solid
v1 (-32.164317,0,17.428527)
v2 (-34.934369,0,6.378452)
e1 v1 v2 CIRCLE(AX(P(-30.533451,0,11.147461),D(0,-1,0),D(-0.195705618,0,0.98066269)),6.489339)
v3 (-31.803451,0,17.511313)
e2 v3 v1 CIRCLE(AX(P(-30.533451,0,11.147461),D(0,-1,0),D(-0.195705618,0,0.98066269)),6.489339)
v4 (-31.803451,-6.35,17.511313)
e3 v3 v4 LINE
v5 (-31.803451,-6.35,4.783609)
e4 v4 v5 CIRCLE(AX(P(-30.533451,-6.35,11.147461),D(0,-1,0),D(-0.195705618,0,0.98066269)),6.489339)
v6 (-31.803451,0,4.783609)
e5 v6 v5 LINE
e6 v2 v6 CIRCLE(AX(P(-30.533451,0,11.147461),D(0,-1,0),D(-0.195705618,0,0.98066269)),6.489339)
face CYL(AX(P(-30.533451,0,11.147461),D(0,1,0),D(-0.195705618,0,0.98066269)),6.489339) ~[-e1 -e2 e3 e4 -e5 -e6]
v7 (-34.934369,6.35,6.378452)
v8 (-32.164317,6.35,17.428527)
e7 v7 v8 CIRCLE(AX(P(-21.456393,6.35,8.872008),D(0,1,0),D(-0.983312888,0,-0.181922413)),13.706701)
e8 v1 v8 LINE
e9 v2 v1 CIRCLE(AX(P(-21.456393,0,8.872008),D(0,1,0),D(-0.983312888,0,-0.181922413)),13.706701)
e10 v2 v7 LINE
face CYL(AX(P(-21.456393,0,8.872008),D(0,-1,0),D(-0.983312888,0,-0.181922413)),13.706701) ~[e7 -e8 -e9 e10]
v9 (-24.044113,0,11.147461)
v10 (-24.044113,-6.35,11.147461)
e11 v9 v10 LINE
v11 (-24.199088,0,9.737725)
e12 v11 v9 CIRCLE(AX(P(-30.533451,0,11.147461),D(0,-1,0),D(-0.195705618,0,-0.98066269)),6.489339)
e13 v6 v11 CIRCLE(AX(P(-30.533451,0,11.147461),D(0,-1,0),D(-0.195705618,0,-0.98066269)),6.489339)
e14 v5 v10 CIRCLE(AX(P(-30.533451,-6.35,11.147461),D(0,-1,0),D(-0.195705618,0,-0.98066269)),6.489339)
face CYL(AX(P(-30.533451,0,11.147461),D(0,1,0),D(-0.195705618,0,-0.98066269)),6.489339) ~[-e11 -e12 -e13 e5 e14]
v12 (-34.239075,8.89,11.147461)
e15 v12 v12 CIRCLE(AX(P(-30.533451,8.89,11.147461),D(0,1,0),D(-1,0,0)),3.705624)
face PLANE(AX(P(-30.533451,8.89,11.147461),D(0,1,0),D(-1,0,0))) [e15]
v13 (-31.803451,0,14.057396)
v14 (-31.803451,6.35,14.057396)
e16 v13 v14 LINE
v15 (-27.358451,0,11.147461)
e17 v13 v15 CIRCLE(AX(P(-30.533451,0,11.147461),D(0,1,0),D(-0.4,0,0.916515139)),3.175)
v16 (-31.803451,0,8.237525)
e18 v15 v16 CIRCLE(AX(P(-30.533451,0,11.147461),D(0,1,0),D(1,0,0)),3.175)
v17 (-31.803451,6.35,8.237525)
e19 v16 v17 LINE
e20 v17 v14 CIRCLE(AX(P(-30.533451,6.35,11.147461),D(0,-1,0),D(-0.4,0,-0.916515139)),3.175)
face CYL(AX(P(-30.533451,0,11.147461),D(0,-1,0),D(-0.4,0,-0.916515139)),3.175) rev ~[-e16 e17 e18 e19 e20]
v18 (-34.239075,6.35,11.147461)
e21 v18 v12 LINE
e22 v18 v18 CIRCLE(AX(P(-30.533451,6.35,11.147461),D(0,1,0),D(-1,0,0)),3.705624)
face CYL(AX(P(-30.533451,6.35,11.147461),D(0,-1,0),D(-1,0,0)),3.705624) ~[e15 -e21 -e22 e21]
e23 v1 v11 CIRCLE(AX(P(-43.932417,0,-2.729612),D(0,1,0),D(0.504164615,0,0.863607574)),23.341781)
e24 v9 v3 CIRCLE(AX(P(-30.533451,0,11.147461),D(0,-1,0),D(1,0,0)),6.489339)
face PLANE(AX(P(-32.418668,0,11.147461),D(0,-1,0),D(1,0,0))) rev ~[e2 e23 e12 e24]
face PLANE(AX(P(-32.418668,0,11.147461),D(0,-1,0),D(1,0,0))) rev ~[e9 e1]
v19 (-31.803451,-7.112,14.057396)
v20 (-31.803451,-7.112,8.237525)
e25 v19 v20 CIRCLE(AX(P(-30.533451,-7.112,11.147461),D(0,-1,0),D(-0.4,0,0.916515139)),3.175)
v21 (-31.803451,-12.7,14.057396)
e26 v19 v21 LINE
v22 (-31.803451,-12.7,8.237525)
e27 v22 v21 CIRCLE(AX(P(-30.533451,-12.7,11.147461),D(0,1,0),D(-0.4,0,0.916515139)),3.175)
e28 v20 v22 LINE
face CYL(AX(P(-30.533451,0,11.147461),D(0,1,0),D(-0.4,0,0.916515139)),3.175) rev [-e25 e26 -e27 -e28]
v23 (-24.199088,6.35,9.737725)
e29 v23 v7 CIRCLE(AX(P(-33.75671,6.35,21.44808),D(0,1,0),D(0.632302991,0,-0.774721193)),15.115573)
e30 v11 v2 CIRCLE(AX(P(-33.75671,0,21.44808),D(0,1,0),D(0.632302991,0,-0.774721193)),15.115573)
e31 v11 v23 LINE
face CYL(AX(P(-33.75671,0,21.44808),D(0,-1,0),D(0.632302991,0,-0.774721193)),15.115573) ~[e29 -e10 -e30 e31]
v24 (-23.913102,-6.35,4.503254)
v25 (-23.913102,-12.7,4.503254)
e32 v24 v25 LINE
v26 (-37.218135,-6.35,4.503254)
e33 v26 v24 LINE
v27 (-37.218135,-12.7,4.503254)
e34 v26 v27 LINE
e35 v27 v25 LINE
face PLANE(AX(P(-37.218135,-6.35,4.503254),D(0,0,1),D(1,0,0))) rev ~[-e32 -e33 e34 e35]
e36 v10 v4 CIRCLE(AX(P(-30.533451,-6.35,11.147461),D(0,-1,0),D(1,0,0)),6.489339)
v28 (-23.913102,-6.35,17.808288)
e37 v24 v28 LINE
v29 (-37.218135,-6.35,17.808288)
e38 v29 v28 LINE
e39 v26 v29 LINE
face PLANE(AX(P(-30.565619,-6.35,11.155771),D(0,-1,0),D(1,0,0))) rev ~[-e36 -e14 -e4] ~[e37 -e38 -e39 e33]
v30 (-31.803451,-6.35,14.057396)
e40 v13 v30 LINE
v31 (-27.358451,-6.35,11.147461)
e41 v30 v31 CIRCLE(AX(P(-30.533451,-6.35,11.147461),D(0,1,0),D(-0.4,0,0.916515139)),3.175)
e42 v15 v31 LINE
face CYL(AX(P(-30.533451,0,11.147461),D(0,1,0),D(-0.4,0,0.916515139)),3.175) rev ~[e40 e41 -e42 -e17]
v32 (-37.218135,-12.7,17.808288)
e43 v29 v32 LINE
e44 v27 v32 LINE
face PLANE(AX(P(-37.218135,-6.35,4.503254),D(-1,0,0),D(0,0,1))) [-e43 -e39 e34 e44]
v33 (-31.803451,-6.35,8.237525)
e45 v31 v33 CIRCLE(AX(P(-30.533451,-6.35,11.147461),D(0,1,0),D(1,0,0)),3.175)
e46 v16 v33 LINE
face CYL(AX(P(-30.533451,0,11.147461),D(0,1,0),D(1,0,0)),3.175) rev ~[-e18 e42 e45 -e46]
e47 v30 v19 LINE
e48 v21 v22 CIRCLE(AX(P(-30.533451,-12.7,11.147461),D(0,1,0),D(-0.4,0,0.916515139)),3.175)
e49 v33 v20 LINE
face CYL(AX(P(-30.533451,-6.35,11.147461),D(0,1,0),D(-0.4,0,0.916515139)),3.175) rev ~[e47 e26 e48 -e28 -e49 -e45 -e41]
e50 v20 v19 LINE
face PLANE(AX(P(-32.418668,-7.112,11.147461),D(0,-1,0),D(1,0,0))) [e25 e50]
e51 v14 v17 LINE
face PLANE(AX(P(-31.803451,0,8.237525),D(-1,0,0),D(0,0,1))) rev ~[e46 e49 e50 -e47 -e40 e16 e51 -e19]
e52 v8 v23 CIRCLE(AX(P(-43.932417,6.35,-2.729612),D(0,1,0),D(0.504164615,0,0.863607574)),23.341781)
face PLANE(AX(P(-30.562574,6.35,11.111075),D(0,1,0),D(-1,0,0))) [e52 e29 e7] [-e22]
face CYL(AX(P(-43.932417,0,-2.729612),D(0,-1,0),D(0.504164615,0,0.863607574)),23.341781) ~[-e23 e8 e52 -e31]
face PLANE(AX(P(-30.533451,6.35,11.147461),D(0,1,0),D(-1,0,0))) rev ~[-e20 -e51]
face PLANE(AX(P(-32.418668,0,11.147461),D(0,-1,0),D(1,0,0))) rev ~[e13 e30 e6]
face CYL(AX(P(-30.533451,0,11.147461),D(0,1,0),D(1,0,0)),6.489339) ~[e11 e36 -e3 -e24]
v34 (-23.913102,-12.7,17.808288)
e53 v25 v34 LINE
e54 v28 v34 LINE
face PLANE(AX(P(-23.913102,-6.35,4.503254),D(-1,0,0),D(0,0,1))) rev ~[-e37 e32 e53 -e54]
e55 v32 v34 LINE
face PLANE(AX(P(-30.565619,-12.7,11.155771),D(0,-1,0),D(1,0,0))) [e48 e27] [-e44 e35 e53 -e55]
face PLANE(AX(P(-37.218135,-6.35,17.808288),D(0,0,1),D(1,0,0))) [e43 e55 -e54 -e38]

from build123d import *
from build123d import SkipClean  # not in build123d's __all__

# Parameters (mm, degrees)
F1_DEPTH = 6.35
F2_W     = 13.3050326258
F2_H     = 13.3050344884
F2_R     = 6.4893385046
F3_DEPTH = 6.35
F4_DEPTH = 25.4
F5_DEPTH = 7.112
F7_DEPTH = 6.35
F8_R     = 3.7056239581
F9_DEPTH = 2.54


# Not quite as in the source:
# - after a boolean that leaves OpenCascade's solid faulty, fix() repairs it


with BuildPart() as f1:
    # F0 (on Front) → F1 (new body)
    with BuildSketch(Plane.XZ):
        with BuildLine():
            ThreePointArc((-31.8034514785, 8.237525334), (-33.7084514785, 11.1474609002), (-31.8034514785, 14.0573964665))
            Line((-31.8034514785, 14.0573964665), (-31.8034514785, 17.5113130534))
            ThreePointArc((-31.8034514785, 17.5113130534), (-37.0227899831, 11.1474609002), (-31.8034514785, 4.7836087471))
            Line((-31.8034514785, 4.7836087471), (-31.8034514785, 8.237525334))
        make_face()
        with BuildLine():
            Line((-31.8034514785, 8.237525334), (-31.8034514785, 14.0573964665))
            ThreePointArc((-31.8034514785, 14.0573964665), (-33.7084514785, 11.1474609002), (-31.8034514785, 8.237525334))
        make_face()
        with BuildLine():
            ThreePointArc((-31.8034514785, 14.0573964665), (-28.7944323584, 13.8038564845), (-27.3584514785, 11.1474609002))
            ThreePointArc((-27.3584514785, 11.1474609002), (-28.7944323584, 8.491065316), (-31.8034514785, 8.237525334))
            Line((-31.8034514785, 8.237525334), (-31.8034514785, 4.7836087471))
            ThreePointArc((-31.8034514785, 4.7836087471), (-26.4182325094, 6.129843232), (-24.0441129739, 11.1474609002))
            ThreePointArc((-24.0441129739, 11.1474609002), (-26.4182325094, 16.1650785684), (-31.8034514785, 17.5113130534))
            Line((-31.8034514785, 17.5113130534), (-31.8034514785, 14.0573964665))
        make_face()
    extrude(amount=F1_DEPTH)

    # F2 (on face) → F3 (join)
    with BuildSketch(Plane.XZ.offset(6.35)):
        with Locations((-30.5656185374, 11.1557710916)):
            Rectangle(F2_W, F2_H)
        with Locations((-30.5334514785, 11.1474609002)):
            Circle(F2_R, mode=Mode.SUBTRACT)
        with Locations((-30.5334514785, 11.1474609002)):
            Circle(F2_R)
        with BuildLine():
            ThreePointArc((-31.8034514785, 14.0573964665), (-27.3584514785, 11.1474609002), (-31.8034514785, 8.237525334))
            Line((-31.8034514785, 8.237525334), (-31.8034514785, 14.0573964665))
        make_face(mode=Mode.SUBTRACT)
    extrude(amount=F3_DEPTH)

    # F0 (on Front) → F4 (cut)
    with BuildSketch(Plane.XZ):
        with BuildLine():
            Line((-31.8034514785, 8.237525334), (-31.8034514785, 14.0573964665))
            ThreePointArc((-31.8034514785, 14.0573964665), (-33.7084514785, 11.1474609002), (-31.8034514785, 8.237525334))
        make_face()
    extrude(amount=F4_DEPTH, mode=Mode.SUBTRACT)

    # F0 (on Front) → F5 (join)
    with BuildSketch(Plane.XZ):
        with BuildLine():
            Line((-31.8034514785, 8.237525334), (-31.8034514785, 14.0573964665))
            ThreePointArc((-31.8034514785, 14.0573964665), (-33.7084514785, 11.1474609002), (-31.8034514785, 8.237525334))
        make_face()
    extrude(amount=F5_DEPTH)

    # F6 (on face) → F7 (join)
    with BuildSketch(Plane(origin=(0, 0, 0), x_dir=(-1, 0, 0), z_dir=(0, 1, 0))):
        with BuildLine():
            ThreePointArc((32.1643167645, 17.4285271033), (27.7190855009, 14.0622502303), (24.1990881726, 9.7377248483))
            ThreePointArc((24.1990881726, 9.7377248483), (29.2426072016, 7.0222894593), (34.9343685496, 6.3784522862))
            ThreePointArc((34.9343685496, 6.3784522862), (34.7517106144, 12.2049013649), (32.1643167645, 17.4285271033))
        make_face()
        with BuildLine():
            Line((31.8034514785, 14.0573964665), (31.8034514785, 8.237525334))
            ThreePointArc((31.8034514785, 8.237525334), (27.3584514785, 11.1474609002), (31.8034514785, 14.0573964665))
        make_face(mode=Mode.SUBTRACT)
    with SkipClean():  # cleaning this boolean's faces spoils the solid; the shape is the same uncleaned
        extrude(amount=F7_DEPTH)

    # F8 (on face) → F9 (join)
    with BuildSketch(Plane(origin=(0, 6.35, 0), x_dir=(-1, 0, 0), z_dir=(0, 1, 0))):
        with Locations((30.5334514785, 11.1474609002)):
            Circle(F8_R)
        with BuildLine():
            ThreePointArc((31.8034514785, 8.237525334), (27.3584514785, 11.1474609002), (31.8034514785, 14.0573964665))
            Line((31.8034514785, 14.0573964665), (31.8034514785, 8.237525334))
        make_face(mode=Mode.SUBTRACT)
        with BuildLine():
            Line((31.8034514785, 8.237525334), (31.8034514785, 14.0573964665))
            ThreePointArc((31.8034514785, 14.0573964665), (27.3584514785, 11.1474609002), (31.8034514785, 8.237525334))
        make_face()
    extrude(amount=F9_DEPTH)

    add(f1.part.fix(), mode=Mode.REPLACE)


solid = f1.part
